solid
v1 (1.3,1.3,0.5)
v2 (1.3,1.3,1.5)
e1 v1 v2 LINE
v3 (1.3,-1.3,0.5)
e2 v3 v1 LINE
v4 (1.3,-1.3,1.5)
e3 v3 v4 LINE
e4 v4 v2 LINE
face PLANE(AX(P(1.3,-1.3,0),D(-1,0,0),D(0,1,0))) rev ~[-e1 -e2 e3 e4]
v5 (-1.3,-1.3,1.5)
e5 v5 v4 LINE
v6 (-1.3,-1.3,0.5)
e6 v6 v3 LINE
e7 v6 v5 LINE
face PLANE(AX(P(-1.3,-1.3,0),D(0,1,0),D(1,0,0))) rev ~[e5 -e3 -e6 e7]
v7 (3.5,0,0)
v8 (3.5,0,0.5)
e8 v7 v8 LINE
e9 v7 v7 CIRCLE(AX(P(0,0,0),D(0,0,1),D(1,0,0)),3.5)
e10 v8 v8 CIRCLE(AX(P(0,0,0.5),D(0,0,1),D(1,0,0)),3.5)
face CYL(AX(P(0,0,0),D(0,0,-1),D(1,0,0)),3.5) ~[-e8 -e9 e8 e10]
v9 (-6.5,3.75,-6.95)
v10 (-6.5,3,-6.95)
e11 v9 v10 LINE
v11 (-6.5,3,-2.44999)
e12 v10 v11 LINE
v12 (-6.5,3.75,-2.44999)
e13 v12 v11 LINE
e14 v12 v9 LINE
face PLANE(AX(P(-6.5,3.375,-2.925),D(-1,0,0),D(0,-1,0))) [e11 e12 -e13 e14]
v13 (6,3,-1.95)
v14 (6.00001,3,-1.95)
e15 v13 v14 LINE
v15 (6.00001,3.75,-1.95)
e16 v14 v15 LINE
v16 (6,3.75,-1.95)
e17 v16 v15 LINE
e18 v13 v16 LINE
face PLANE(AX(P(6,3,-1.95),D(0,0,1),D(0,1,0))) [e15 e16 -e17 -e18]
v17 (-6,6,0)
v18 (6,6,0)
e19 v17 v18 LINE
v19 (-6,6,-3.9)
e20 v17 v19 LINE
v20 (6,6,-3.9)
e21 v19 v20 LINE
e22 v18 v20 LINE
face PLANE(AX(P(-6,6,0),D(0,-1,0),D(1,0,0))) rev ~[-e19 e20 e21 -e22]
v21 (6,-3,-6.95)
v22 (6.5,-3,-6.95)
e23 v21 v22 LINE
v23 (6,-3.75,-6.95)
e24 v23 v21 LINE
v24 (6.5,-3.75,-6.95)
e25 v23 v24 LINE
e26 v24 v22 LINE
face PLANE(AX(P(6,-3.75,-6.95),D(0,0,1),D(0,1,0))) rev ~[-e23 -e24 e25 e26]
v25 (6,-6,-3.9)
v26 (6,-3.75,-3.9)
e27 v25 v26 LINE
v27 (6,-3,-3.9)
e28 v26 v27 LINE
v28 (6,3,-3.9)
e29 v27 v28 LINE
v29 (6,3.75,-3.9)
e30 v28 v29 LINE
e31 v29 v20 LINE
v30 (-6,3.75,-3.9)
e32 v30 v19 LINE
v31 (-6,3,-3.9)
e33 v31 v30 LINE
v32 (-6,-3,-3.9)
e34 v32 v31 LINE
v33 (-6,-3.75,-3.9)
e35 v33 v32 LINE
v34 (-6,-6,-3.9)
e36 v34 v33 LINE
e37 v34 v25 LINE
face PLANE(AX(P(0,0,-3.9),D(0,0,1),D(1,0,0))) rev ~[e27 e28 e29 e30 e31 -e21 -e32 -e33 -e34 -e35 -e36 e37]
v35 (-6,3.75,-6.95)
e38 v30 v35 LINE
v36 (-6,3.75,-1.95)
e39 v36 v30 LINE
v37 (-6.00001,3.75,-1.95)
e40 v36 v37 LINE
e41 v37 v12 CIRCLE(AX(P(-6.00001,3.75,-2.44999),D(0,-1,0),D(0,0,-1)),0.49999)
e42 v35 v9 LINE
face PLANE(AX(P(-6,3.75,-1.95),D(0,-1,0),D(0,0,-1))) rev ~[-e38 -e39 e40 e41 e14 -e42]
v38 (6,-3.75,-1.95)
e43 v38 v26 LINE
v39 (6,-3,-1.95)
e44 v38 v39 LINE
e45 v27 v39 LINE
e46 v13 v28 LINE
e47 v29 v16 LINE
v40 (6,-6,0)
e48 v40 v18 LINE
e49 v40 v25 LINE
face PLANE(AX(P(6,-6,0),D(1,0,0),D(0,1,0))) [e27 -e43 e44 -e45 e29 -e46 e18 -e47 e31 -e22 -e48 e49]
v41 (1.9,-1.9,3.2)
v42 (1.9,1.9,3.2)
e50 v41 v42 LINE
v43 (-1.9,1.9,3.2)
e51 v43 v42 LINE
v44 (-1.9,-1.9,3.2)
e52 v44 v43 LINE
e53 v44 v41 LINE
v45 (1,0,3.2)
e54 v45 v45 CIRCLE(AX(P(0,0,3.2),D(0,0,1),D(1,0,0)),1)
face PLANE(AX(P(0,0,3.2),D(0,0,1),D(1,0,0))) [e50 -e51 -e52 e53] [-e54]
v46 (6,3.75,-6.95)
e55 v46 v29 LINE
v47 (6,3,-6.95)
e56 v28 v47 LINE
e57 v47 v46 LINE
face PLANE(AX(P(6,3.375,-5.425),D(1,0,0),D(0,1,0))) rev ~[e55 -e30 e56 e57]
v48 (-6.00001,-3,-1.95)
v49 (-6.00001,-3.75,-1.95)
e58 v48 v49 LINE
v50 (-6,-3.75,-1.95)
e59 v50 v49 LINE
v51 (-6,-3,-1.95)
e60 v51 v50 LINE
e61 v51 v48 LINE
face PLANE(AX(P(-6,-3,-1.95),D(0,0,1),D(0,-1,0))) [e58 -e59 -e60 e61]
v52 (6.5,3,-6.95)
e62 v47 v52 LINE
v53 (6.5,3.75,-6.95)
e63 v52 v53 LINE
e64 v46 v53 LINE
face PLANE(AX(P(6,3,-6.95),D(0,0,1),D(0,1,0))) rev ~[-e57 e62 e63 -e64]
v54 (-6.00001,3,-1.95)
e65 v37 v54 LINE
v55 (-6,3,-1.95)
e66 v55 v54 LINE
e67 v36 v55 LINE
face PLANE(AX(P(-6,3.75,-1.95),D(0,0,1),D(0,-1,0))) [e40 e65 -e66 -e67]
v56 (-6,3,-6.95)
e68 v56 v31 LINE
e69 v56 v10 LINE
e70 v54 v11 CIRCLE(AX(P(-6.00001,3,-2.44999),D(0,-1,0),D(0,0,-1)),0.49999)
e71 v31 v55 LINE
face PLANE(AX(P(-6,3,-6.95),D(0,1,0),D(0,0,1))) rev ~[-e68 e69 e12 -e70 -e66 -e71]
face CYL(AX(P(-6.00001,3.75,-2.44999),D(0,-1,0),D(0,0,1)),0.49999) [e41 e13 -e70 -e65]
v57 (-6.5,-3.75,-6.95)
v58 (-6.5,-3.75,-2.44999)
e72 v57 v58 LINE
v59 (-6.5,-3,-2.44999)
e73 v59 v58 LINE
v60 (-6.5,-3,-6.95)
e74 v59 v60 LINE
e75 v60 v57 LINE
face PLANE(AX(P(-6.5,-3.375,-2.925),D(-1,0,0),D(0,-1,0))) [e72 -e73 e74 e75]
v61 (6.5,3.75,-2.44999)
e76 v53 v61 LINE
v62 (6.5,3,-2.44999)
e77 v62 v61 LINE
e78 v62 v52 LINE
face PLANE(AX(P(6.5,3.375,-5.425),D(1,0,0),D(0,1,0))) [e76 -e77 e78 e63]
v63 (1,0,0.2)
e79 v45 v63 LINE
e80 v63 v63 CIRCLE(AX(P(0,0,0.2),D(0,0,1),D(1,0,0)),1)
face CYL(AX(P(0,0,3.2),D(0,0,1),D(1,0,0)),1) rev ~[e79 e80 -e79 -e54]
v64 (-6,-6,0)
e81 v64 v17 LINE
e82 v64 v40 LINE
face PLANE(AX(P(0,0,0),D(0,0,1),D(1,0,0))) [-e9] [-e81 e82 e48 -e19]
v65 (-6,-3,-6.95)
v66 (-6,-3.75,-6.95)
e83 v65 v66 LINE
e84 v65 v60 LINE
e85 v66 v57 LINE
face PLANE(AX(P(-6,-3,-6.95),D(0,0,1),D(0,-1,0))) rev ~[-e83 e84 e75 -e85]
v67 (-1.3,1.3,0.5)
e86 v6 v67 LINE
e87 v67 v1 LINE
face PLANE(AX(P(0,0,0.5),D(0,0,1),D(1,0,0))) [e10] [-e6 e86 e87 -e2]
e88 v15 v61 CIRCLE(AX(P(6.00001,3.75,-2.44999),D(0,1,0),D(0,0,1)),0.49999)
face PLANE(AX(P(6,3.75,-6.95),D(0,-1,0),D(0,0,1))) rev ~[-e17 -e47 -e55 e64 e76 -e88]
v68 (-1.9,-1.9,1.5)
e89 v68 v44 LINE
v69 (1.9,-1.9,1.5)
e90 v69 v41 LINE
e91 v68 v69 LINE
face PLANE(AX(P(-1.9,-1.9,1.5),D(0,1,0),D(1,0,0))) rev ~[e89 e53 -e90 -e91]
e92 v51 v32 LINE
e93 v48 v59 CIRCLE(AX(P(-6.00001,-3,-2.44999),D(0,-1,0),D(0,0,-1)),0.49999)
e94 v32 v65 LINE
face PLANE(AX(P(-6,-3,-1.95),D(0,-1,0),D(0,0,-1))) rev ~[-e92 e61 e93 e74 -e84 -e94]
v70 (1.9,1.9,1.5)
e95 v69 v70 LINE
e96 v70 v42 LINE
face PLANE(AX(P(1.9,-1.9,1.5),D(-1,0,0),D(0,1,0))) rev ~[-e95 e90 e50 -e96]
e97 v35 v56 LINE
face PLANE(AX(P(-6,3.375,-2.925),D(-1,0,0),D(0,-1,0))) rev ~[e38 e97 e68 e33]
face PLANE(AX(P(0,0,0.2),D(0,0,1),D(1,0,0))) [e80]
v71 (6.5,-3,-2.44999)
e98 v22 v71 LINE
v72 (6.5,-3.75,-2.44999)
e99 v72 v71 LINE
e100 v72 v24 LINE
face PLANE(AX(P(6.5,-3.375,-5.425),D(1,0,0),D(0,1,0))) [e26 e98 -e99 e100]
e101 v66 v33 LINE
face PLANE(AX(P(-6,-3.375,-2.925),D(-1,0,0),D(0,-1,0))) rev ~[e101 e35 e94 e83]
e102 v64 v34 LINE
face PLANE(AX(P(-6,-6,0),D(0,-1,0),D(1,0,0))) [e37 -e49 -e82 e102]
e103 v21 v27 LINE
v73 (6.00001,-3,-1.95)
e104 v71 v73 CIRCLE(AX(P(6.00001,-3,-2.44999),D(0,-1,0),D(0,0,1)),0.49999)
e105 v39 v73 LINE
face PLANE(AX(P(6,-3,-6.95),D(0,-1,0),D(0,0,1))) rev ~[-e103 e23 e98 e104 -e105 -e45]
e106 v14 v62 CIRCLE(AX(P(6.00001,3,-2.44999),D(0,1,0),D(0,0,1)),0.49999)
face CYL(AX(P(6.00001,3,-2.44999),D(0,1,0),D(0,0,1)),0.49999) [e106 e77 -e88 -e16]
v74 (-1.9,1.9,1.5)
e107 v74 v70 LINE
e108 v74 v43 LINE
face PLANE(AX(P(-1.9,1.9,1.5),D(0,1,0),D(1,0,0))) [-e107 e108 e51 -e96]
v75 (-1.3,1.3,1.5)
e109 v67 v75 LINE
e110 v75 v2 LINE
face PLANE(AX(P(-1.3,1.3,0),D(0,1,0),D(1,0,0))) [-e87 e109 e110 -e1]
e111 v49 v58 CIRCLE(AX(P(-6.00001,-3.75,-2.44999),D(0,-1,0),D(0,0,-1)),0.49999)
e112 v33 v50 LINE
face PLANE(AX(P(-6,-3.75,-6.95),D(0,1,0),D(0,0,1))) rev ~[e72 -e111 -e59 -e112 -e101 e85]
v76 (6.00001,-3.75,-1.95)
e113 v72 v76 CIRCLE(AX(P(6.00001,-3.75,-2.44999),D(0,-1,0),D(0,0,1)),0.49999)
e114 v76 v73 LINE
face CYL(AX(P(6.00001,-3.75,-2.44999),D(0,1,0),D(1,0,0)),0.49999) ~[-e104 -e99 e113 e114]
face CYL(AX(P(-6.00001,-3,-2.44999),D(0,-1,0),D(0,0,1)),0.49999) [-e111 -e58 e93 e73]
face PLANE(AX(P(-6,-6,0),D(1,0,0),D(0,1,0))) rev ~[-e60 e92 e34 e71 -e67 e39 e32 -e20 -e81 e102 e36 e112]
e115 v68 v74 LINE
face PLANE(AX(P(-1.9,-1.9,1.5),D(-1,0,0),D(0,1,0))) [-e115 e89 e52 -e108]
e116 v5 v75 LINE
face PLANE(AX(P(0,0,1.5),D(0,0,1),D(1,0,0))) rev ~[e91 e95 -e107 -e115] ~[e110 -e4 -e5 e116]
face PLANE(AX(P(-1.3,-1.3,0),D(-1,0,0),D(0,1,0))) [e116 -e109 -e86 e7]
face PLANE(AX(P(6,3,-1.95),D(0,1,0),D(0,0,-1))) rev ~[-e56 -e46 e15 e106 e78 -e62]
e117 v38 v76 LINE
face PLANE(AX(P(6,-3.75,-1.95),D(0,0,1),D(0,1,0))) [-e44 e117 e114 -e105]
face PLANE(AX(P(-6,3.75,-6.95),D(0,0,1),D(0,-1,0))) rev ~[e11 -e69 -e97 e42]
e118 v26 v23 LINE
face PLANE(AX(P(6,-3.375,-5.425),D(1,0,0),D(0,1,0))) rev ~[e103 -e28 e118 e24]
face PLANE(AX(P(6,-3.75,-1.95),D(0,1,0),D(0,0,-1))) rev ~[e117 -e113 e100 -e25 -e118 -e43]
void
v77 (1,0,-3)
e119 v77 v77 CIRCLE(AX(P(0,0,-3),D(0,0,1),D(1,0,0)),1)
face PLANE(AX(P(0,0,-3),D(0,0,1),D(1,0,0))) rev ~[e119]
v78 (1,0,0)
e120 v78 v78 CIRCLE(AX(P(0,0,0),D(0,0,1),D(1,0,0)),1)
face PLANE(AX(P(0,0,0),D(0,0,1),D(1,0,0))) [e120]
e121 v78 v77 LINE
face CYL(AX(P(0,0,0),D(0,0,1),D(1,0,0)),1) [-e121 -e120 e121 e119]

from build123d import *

# Parameters (mm, degrees)
F0_W      = 12
F0_H      = 12
F0_R      = 3.5
F0_W_2    = 3.8
F0_H_2    = 3.8
F0_W_3    = 2.6
F0_H_3    = 2.6
F1_DEPTH  = 3.9
F2_DEPTH  = 0.5
F3_DEPTH  = 1.5
F4_R      = 1
F5_DEPTH  = 3
F6_W      = 3.8
F6_H      = 3.8
F6_W_2    = 2.6
F6_H_2    = 2.6
F7_DEPTH  = 1.7
F8_R      = 1
F9_DEPTH  = 3
F10_W     = 0.75
F10_H     = 3.05
F10_H_2   = 1.95
F12_DEPTH = 0.5
F13_R     = 0.49999
F11_W     = 0.75
F11_H     = 1.95
F11_H_2   = 3.05
F14_DEPTH = 0.5
F15_R     = 0.49999


# Not quite as in the source:
# - a fillet or chamfer is up to 0.001 mm smaller than in the source, because OpenCascade refuses the exact size


with BuildPart() as f1:
    # F0 (on Top) → F1 (new body)
    with BuildSketch(Plane.XY):
        Rectangle(F0_W, F0_H)
        Circle(F0_R, mode=Mode.SUBTRACT)
        Circle(F0_R)
        Rectangle(F0_W_2, F0_H_2, mode=Mode.SUBTRACT)
        Rectangle(F0_W_2, F0_H_2)
        Rectangle(F0_W_3, F0_H_3, mode=Mode.SUBTRACT)
        Rectangle(F0_W_3, F0_H_3)
    extrude(amount=-F1_DEPTH)

    # F0 (on Top) → F2 (join)
    with BuildSketch(Plane.XY):
        Circle(F0_R)
        Rectangle(F0_W_2, F0_H_2, mode=Mode.SUBTRACT)
        Rectangle(F0_W_2, F0_H_2)
        Rectangle(F0_W_3, F0_H_3, mode=Mode.SUBTRACT)
    extrude(amount=F2_DEPTH)

    # F0 (on Top) → F3 (join)
    with BuildSketch(Plane.XY):
        Rectangle(F0_W_3, F0_H_3)
    extrude(amount=F3_DEPTH)

    # F4 (on face) → F5 (cut)
    with BuildSketch(Plane.XY):
        Circle(F4_R)
    extrude(amount=-F5_DEPTH, mode=Mode.SUBTRACT)

    # F6 (on face) → F7 (join)
    with BuildSketch(Plane.XY.offset(1.5)):
        Rectangle(F6_W, F6_H)
        Rectangle(F6_W_2, F6_H_2, mode=Mode.SUBTRACT)
        Rectangle(F6_W_2, F6_H_2)
    extrude(amount=F7_DEPTH)

    # F8 (on face) → F9 (cut)
    with BuildSketch(Plane.XY.offset(3.2)):
        Circle(F8_R)
    extrude(amount=-F9_DEPTH, mode=Mode.SUBTRACT)

    # F10 (on face) → F12 (join)
    with BuildSketch(Plane.YZ.offset(6)):
        with Locations((-3.375, -5.425)):
            Rectangle(F10_W, F10_H)
        with Locations((-3.375, -2.925)):
            Rectangle(F10_W, F10_H_2)
        with Locations((3.375, -5.425)):
            Rectangle(F10_W, F10_H)
        with Locations((3.375, -2.925)):
            Rectangle(F10_W, F10_H_2)
    extrude(amount=F12_DEPTH)

    # F13 (radius 0.5 in the source; OpenCascade refuses exactly that, so slightly less here)
    f13_edges = [f1.edges().sort_by_distance(p)[0] for p in [
        (6.5, -3.375, -1.95),
        (6.5, 3.375, -1.95),
    ]]
    fillet(f13_edges, radius=F13_R)

    # F11 (on face) → F14 (join)
    with BuildSketch(Plane(origin=(-6, 0, 0), x_dir=(0, -1, 0), z_dir=(-1, 0, 0))):
        with Locations((3.375, -2.925)):
            Rectangle(F11_W, F11_H)
        with Locations((-3.375, -2.925)):
            Rectangle(F11_W, F11_H)
        with Locations((-3.375, -5.425)):
            Rectangle(F11_W, F11_H_2)
        with Locations((3.375, -5.425)):
            Rectangle(F11_W, F11_H_2)
    extrude(amount=F14_DEPTH)

    # F15 (radius 0.5 in the source; OpenCascade refuses exactly that, so slightly less here)
    f15_edges = [f1.edges().sort_by_distance(p)[0] for p in [
        (-6.5, 3.375, -1.95),
        (-6.5, -3.375, -1.95),
    ]]
    fillet(f15_edges, radius=F15_R)


solid = f1.part
